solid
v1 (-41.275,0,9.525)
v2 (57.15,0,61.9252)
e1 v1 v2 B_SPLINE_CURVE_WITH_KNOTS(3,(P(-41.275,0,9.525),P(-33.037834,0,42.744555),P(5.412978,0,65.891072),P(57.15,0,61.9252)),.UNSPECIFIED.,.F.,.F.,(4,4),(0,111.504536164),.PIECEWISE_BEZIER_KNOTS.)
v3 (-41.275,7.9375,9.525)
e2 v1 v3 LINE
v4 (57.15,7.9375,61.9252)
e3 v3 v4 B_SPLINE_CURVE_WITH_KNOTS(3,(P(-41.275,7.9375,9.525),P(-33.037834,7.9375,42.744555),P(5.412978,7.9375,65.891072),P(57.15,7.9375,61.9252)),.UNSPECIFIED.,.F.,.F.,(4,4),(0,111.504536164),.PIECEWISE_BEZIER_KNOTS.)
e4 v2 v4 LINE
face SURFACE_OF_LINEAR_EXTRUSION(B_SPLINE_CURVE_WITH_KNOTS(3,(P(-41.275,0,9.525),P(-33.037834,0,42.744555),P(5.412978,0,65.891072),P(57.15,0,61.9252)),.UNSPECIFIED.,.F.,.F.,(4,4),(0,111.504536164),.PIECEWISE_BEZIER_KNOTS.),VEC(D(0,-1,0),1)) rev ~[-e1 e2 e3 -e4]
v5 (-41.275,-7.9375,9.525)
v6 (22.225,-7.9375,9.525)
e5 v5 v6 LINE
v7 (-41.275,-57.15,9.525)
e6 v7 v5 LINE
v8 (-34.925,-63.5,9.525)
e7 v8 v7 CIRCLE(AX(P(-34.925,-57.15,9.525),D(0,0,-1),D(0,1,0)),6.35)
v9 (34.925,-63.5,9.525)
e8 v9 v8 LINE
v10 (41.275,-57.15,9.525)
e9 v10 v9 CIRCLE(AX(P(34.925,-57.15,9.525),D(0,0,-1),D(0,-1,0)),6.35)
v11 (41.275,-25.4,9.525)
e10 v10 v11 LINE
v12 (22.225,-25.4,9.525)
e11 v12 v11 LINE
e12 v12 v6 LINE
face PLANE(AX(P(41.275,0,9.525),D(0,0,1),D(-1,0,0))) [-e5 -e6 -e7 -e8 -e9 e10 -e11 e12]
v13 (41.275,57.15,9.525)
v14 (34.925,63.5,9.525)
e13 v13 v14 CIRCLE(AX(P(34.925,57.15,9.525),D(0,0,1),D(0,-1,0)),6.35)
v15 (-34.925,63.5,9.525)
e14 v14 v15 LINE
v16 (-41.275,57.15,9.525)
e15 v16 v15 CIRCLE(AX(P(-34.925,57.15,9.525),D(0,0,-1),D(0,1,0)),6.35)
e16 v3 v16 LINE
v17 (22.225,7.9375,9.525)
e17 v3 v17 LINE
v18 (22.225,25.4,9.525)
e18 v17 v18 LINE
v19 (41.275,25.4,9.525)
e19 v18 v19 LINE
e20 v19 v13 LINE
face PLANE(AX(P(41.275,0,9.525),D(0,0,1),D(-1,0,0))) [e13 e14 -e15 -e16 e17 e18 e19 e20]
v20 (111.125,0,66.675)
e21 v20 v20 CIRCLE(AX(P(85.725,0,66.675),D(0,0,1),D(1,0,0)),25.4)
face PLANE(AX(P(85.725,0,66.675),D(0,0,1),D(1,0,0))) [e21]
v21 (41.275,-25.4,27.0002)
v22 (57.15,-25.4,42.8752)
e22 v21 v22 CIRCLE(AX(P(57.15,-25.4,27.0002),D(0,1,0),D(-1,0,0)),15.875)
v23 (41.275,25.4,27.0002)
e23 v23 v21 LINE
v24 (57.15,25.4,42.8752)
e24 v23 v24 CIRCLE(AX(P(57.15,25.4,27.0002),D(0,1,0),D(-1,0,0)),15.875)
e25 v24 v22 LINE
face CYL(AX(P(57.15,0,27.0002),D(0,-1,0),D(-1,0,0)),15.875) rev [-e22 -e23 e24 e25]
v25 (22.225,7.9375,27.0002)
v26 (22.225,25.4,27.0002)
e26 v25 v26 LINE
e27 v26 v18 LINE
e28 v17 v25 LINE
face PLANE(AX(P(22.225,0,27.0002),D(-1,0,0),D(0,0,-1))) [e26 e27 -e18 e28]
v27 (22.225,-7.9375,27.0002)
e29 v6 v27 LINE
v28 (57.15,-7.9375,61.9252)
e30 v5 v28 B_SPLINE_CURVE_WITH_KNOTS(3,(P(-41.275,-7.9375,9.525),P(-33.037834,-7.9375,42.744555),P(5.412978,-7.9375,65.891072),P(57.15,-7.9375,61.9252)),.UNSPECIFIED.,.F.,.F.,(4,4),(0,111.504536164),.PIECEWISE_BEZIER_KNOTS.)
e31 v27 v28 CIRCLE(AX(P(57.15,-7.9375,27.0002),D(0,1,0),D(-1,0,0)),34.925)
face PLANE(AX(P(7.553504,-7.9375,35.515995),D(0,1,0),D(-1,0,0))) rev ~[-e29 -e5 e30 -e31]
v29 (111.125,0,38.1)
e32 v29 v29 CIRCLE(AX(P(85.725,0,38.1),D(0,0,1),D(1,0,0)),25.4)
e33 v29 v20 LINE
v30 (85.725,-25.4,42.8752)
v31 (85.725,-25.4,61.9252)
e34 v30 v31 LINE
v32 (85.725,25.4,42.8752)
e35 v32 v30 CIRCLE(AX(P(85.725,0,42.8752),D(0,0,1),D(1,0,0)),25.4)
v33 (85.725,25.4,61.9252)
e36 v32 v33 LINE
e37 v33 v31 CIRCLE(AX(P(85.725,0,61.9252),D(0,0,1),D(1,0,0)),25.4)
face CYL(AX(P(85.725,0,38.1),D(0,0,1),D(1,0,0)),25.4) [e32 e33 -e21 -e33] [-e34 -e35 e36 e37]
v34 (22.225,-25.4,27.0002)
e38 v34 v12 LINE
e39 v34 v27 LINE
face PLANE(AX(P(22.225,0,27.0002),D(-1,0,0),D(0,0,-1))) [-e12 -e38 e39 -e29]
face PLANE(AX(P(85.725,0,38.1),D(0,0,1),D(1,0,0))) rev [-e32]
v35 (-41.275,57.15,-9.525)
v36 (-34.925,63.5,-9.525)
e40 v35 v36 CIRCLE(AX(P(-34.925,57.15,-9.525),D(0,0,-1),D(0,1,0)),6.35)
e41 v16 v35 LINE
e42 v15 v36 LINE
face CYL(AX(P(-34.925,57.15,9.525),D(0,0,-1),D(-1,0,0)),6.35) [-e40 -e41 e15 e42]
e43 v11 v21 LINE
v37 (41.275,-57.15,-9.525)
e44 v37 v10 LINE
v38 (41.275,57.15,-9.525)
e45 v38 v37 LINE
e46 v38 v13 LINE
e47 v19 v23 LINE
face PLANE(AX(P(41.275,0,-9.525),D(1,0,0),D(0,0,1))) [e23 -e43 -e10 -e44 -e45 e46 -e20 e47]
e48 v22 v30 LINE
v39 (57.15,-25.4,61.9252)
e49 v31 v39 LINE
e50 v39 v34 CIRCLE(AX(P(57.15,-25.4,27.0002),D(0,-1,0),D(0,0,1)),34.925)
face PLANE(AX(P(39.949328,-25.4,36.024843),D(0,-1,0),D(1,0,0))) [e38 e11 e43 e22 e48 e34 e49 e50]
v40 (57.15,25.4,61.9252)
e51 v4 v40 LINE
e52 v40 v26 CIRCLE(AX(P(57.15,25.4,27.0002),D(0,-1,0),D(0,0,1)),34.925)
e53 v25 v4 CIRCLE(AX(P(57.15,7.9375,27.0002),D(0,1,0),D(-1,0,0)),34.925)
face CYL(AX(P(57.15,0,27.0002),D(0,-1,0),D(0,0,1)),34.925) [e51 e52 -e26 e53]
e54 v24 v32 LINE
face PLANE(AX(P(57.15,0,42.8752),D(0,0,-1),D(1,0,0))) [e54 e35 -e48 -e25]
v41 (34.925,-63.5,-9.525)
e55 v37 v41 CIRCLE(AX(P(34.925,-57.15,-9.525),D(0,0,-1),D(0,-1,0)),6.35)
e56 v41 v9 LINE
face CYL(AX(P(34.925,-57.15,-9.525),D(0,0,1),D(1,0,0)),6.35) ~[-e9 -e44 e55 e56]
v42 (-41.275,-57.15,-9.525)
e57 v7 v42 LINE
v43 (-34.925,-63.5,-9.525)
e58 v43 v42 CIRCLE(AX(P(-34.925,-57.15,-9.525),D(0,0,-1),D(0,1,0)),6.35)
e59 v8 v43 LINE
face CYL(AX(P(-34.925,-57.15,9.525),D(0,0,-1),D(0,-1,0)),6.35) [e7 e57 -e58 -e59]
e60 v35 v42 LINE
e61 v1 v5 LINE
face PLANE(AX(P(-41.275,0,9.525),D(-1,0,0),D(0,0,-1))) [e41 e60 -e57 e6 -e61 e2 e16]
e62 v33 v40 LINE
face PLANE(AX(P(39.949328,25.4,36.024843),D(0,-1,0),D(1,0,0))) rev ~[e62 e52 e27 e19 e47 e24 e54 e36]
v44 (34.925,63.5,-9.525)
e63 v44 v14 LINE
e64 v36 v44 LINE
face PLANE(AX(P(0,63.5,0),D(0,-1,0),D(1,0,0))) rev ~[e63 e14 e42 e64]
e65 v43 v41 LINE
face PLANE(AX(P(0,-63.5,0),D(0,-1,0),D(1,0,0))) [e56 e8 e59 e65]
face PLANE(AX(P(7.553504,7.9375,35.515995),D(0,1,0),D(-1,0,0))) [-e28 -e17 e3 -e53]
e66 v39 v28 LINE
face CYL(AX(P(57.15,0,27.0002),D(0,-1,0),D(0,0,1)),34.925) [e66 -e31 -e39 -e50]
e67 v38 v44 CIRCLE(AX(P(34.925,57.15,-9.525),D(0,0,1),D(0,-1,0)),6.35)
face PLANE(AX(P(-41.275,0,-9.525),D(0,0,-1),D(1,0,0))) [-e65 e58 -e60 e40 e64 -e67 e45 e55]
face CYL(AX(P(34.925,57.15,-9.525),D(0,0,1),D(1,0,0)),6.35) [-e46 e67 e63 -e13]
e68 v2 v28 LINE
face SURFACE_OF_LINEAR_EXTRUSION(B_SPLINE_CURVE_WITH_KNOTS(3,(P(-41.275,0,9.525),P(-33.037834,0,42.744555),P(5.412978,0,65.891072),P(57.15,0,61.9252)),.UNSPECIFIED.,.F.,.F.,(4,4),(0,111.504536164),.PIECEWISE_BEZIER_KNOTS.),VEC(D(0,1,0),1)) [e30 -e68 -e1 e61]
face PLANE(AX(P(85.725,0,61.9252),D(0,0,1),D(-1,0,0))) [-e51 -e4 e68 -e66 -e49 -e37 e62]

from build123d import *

# Parameters (mm, degrees)
F1_DEPTH = 63.5
F0_W     = 25.4
F0_H     = 19.05
F2_DEPTH = 25.4
F3_DEPTH = 7.9375
F5_R     = 6.35


# Not quite as in the source:
# - a feature names something its author has since deleted; it is built from what else it names


with BuildPart() as f1:
    # F0 (on Front) → F1 (new body, symmetric)
    with BuildSketch(Plane.XZ):
        Polygon((-41.275, 9.525), (-41.275, -9.525), (41.275, -9.525), (41.275, 9.525), (22.225, 9.525), align=None)
    extrude(amount=F1_DEPTH, both=True)

    # F0 (on Front) → F2 (join, symmetric)
    with BuildSketch(Plane.XZ):
        with BuildLine():
            Line((22.225, 9.525), (41.275, 9.525))
            Line((41.275, 9.525), (41.275, 27.0002))
            ThreePointArc((41.275, 27.0002), (45.9246798487, 38.2255201513), (57.15, 42.8752))
            Line((57.15, 42.8752), (60.325, 42.8752))
            Line((60.325, 42.8752), (60.325, 61.9252))
            Line((60.325, 61.9252), (57.15, 61.9252))
            ThreePointArc((57.15, 61.9252), (32.4542956671, 51.6959043329), (22.225, 27.0002))
            Line((22.225, 27.0002), (22.225, 9.525))
        make_face()
        with Locations((73.025, 52.4002)):
            Rectangle(F0_W, F0_H)
    extrude(amount=F2_DEPTH, both=True)

    # F0 (on Front) → F3 (join, symmetric)
    with BuildSketch(Plane.XZ):
        with BuildLine():
            add(Edge.make_bspline(
                [(-41.275, 9.525), (-33.0378338695, 42.7445545793), (5.4129776545, 65.891072154), (57.15, 61.9252)],
                knots=[0, 0, 0, 0, 111.5045361635, 111.5045361635, 111.5045361635, 111.5045361635], degree=3))
            Line((-41.275, 9.525), (22.225, 9.525))
            Line((22.225, 9.525), (22.225, 27.0002))
            ThreePointArc((22.225, 27.0002), (32.4542956671, 51.6959043329), (57.15, 61.9252))
        make_face()
    extrude(amount=F3_DEPTH, both=True)

    # F0 (on Front) → F4 (revolve)
    with BuildSketch(Plane.XZ):
        Polygon((85.725, 66.675), (85.725, 61.9252), (85.725, 42.8752), (85.725, 38.1), (111.125, 38.1), (111.125, 66.675), align=None)
    revolve(axis=Axis((85.725, 0, 52.3875), (0, 0, 1)))

    # F5
    f5_edges = [f1.edges().sort_by_distance(p)[0] for p in [
        (41.275, -63.5, 0),
        (-41.275, -63.5, 0),
        (41.275, 63.5, 0),
        (-41.275, 63.5, 0),
    ]]
    fillet(f5_edges, radius=F5_R)


solid = f1.part
